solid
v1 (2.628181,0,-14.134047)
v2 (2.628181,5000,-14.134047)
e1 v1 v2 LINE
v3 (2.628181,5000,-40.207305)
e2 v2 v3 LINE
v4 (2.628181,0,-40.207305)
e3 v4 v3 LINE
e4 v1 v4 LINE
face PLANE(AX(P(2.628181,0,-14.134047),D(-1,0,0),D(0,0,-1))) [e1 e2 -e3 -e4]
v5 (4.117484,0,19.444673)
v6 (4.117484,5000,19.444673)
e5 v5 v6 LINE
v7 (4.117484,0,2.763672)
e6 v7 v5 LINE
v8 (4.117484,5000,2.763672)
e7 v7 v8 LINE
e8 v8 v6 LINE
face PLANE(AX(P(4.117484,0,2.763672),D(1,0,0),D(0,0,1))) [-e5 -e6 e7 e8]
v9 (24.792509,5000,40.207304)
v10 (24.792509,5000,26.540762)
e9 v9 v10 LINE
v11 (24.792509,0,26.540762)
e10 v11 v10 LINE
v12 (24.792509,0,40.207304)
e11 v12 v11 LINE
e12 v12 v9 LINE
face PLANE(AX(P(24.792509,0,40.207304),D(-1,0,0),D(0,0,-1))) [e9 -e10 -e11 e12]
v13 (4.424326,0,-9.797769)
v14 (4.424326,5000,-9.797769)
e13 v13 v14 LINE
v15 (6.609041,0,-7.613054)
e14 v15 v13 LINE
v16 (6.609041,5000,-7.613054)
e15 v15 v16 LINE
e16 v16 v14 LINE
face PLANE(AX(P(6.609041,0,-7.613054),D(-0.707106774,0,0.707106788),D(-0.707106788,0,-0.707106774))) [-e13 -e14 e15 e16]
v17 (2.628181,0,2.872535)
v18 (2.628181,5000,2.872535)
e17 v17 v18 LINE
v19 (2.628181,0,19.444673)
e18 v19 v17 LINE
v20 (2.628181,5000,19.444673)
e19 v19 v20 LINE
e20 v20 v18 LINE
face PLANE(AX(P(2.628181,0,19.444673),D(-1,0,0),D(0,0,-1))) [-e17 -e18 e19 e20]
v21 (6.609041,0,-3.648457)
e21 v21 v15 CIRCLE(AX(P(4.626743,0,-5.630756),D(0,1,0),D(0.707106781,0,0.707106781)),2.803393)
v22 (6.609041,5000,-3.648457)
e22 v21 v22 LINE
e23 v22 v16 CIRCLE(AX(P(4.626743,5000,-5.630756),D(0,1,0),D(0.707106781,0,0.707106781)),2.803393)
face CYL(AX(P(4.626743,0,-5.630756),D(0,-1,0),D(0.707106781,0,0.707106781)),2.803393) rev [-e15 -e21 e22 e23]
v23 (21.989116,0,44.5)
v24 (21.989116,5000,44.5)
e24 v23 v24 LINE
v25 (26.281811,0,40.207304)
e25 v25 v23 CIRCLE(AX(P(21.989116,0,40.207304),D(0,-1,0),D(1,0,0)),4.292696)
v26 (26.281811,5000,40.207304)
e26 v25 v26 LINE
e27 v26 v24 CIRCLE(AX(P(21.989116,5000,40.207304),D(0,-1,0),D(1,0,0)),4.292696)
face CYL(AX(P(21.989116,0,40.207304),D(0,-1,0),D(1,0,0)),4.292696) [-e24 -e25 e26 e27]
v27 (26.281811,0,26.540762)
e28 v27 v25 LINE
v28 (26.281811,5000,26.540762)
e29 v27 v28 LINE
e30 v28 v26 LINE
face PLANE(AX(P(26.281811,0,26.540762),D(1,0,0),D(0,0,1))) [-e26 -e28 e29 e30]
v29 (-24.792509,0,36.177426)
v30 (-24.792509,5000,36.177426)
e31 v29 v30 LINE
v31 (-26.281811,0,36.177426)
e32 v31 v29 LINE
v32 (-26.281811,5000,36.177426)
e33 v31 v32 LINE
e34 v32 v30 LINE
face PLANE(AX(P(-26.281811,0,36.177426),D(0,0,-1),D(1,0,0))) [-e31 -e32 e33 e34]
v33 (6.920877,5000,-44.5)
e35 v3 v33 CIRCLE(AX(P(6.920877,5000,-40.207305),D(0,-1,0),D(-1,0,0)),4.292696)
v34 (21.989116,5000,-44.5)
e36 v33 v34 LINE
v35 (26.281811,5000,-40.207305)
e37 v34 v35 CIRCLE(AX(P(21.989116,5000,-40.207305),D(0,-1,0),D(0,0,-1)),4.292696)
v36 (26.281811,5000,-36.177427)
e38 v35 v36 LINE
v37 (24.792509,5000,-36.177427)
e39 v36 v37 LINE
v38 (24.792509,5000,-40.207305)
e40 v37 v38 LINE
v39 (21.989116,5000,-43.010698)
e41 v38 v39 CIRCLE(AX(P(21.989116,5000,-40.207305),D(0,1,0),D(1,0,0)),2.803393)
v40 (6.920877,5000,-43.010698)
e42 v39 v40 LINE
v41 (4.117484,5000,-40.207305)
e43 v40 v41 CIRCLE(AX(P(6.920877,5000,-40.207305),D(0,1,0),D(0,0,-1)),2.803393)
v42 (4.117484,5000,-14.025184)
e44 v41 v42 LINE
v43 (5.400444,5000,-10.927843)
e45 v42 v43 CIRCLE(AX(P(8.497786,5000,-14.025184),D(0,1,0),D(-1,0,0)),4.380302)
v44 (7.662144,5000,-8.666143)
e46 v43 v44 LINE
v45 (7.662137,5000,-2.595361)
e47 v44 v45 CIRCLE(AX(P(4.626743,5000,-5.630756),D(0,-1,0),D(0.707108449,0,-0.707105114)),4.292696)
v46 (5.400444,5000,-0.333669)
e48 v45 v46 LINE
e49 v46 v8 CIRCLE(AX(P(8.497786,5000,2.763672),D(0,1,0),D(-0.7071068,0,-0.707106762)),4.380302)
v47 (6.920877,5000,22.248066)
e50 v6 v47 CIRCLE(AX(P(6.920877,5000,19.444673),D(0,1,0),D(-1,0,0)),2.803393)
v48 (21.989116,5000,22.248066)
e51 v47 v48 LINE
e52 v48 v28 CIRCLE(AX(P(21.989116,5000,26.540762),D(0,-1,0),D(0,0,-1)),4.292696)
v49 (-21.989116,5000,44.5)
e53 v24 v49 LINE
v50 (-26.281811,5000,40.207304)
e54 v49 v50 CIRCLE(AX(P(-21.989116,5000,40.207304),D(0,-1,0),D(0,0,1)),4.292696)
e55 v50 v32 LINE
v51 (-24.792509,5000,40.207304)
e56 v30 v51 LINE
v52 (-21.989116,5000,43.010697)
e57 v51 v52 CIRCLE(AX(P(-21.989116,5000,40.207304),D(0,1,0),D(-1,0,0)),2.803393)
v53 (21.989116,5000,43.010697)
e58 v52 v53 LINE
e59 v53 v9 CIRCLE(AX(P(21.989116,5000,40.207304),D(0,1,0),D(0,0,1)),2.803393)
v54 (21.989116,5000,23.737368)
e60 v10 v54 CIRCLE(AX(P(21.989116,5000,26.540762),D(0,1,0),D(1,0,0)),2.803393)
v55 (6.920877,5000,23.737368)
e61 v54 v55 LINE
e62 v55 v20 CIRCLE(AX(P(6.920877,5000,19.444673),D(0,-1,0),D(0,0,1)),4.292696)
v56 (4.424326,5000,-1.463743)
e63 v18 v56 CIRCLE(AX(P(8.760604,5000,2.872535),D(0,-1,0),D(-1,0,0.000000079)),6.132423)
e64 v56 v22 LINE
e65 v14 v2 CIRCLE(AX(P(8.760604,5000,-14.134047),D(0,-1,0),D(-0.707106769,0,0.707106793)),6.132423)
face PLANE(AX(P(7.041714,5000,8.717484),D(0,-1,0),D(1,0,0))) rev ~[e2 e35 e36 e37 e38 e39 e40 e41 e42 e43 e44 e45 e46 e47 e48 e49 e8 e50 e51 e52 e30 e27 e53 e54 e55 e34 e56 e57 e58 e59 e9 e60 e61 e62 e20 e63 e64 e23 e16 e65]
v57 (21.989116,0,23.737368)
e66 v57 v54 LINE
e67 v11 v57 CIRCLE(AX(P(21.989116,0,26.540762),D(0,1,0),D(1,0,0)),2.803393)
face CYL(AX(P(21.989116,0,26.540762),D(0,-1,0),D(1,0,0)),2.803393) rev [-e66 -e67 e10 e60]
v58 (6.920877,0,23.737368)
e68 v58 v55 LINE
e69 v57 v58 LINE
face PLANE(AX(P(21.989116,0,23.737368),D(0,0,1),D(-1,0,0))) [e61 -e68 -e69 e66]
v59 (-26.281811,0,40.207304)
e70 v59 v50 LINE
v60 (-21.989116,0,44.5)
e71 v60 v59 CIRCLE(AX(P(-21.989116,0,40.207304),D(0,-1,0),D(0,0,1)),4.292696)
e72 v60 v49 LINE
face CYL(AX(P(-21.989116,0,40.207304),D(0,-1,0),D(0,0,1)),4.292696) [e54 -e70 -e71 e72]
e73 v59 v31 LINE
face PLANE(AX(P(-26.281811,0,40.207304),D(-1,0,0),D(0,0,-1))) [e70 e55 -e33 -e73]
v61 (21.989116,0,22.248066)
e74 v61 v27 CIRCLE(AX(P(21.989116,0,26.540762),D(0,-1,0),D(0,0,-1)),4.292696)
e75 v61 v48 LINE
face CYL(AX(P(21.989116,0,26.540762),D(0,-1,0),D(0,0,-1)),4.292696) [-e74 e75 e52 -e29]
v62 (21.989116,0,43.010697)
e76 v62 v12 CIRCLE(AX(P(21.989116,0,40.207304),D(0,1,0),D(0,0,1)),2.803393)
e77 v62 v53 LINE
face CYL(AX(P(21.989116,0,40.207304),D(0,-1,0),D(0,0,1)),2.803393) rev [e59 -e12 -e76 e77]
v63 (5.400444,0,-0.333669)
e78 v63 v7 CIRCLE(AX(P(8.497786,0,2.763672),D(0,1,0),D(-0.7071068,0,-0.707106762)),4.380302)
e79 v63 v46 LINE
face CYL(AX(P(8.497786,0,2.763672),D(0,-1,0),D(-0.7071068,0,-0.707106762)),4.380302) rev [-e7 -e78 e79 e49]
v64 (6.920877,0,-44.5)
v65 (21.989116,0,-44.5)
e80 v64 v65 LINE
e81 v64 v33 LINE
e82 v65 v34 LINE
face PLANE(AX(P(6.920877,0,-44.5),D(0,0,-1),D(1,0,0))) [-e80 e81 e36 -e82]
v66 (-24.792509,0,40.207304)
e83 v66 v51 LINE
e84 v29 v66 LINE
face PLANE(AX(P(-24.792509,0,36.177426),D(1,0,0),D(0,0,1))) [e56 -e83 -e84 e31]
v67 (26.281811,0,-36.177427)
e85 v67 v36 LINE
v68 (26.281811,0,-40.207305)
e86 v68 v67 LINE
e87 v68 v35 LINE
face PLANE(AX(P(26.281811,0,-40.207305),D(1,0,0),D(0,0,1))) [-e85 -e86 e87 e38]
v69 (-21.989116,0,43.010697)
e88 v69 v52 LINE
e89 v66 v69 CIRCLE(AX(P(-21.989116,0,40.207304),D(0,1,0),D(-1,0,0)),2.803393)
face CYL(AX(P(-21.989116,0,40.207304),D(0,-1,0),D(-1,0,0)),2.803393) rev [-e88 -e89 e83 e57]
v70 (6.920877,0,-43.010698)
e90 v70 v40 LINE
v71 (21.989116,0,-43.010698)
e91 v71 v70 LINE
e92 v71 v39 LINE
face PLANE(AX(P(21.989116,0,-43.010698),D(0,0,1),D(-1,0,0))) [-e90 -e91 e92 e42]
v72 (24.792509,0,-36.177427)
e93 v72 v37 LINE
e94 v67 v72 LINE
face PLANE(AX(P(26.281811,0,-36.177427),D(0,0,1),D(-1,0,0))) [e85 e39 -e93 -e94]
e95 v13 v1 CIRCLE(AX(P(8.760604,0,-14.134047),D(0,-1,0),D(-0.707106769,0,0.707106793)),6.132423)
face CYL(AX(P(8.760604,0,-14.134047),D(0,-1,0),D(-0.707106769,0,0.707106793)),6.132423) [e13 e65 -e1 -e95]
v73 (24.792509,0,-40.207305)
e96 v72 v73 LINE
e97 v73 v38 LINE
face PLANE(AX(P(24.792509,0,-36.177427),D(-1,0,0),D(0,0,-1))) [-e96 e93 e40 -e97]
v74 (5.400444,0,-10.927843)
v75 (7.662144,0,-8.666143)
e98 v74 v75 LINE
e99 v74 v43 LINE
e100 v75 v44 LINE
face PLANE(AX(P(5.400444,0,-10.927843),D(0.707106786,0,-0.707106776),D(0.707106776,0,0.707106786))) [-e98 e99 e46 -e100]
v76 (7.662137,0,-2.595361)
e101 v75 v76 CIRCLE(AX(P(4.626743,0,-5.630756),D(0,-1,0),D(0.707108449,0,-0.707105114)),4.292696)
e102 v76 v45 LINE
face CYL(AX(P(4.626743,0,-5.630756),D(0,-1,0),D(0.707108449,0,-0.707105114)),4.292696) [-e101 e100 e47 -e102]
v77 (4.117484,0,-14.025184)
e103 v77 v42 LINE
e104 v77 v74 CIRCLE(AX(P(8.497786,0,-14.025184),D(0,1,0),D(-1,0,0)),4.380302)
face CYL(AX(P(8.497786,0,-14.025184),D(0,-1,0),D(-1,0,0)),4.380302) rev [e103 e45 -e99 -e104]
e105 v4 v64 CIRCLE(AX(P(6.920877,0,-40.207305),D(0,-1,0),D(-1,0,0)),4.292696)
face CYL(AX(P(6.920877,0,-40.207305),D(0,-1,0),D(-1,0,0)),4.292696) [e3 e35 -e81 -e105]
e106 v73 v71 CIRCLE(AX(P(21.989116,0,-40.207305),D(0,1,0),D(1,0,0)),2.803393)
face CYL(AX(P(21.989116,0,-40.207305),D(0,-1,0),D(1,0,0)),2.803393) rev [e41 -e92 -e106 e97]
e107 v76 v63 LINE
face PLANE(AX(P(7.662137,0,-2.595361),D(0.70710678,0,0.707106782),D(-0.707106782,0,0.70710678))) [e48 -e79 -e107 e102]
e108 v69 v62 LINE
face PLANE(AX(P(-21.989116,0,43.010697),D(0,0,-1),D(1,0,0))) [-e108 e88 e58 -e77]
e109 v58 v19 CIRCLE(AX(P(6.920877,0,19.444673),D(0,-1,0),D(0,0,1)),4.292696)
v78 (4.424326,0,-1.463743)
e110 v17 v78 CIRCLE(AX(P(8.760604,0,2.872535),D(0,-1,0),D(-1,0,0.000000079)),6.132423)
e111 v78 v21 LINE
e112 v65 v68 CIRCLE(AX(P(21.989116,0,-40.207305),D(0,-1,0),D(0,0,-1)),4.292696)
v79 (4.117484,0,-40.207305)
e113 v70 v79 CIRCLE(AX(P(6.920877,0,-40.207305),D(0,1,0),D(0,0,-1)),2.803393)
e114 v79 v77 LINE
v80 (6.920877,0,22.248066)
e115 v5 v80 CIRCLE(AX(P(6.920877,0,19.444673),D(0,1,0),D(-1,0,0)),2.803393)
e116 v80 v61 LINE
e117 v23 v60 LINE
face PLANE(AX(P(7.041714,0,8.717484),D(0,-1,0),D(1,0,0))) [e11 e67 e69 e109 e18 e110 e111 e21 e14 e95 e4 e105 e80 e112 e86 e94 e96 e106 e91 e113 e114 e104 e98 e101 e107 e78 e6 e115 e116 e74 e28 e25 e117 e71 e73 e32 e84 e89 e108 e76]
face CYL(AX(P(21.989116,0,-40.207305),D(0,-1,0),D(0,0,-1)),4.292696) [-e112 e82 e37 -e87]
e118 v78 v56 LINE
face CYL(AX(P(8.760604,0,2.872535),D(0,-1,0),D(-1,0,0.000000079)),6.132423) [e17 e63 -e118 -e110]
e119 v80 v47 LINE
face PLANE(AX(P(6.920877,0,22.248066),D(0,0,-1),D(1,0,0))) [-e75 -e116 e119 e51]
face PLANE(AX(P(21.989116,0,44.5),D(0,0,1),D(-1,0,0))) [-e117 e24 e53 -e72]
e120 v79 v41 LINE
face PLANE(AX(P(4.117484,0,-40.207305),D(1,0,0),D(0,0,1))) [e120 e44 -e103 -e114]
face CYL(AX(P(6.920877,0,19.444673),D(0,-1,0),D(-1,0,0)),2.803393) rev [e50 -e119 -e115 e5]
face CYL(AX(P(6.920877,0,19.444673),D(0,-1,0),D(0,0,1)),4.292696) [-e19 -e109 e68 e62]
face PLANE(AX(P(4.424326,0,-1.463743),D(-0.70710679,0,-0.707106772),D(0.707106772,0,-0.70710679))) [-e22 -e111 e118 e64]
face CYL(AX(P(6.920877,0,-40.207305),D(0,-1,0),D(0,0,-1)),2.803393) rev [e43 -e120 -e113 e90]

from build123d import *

# Parameters (mm, degrees)
F1_DEPTH = 5000


# Not quite as in the source:
# - ends of sketch curves that miss each other by under 0.0002 mm in the source are joined


with BuildPart() as f1:
    # F0 (on Front) → F1 (new body)
    with BuildSketch(Plane.XZ):
        with BuildLine():
            Line((26.2818114252, -40.2073050281), (26.2818114252, -36.177426882))
            Line((26.2818114252, -36.177426882), (24.7925087778, -36.177426882))
            Line((24.7925087778, -36.177426882), (24.7925087778, -40.2073046339))
            ThreePointArc((24.7925087778, -40.2073046339), (23.9714139143, -42.1896029892), (21.9891155591, -43.0106978526))
            Line((21.9891155591, -43.0106978526), (6.9208770086, -43.0106978526))
            ThreePointArc((6.9208770086, -43.0106978526), (4.9385786534, -42.1896029892), (4.1174837899, -40.2073046339))
            Line((4.1174837899, -40.2073046339), (4.1174837899, -30.6058300818))
            Line((4.1174837899, -30.6058300818), (4.1174837899, -14.0251837989))
            ThreePointArc((4.1174837899, -14.0251837989), (4.4509143771, -12.3489149315), (5.4004443607, -10.9278427721))
            Line((5.4004443607, -10.9278427721), (7.6621440673, -8.6661430321))
            ThreePointArc((7.6621440673, -8.6661430321), (8.9194384176, -5.6307558244), (7.662136908, -2.5953614834))
            Line((7.662136908, -2.5953614834), (5.4004444754, -0.3336690558))
            ThreePointArc((5.4004444754, -0.3336690558), (4.4509144127, 1.0874031659), (4.1174837899, 2.7636721191))
            Line((4.1174837899, 2.7636721191), (4.1174837899, 19.444672608))
            ThreePointArc((4.1174837899, 19.444672608), (4.9385786534, 21.4269709633), (6.9208770086, 22.2480658267))
            Line((6.9208770086, 22.2480658267), (21.9891155591, 22.2480658267))
            ThreePointArc((21.9891155591, 22.2480658267), (25.0245099156, 23.5053673363), (26.2818114252, 26.5407616928))
            Line((26.2818114252, 26.5407616928), (26.2818114252, 40.2073036339))
            ThreePointArc((26.2818114252, 40.2073036339), (25.0245099156, 43.2426979904), (21.9891155591, 44.4999995))
            Line((21.9891155591, 44.4999995), (-21.9891155591, 44.4999995))
            ThreePointArc((-21.9891155591, 44.4999995), (-25.0245099156, 43.2426979904), (-26.2818114252, 40.2073036339))
            Line((-26.2818114252, 40.2073036339), (-26.2818114252, 36.177425882))
            Line((-26.2818114252, 36.177425882), (-24.7925087778, 36.177425882))
            Line((-24.7925087778, 36.177425882), (-24.7925087778, 40.2073036339))
            ThreePointArc((-24.7925087778, 40.2073036339), (-23.9714139143, 42.1896019892), (-21.9891155591, 43.0106968526))
            Line((-21.9891155591, 43.0106968526), (21.9891155591, 43.0106968526))
            ThreePointArc((21.9891155591, 43.0106968526), (23.9714139143, 42.1896019892), (24.7925087778, 40.2073036339))
            Line((24.7925087778, 40.2073036339), (24.7925087778, 26.5407616928))
            ThreePointArc((24.7925087778, 26.5407616928), (23.9714139143, 24.5584633375), (21.9891155591, 23.7373684741))
            Line((21.9891155591, 23.7373684741), (6.9208770086, 23.7373684741))
            ThreePointArc((6.9208770086, 23.7373684741), (3.8854826521, 22.4800669645), (2.6281811425, 19.444672608))
            Line((2.6281811425, 19.444672608), (2.6281811425, 2.8725354557))
            ThreePointArc((2.6281811425, 2.8725354557), (3.0949839305, 0.525758642), (4.4243261563, -1.4637426783))
            Line((4.4243261563, -1.4637426783), (6.6090409069, -3.6484574844))
            ThreePointArc((6.6090409069, -3.6484574844), (7.4301357701, -5.6307558399), (6.6090409067, -7.6130541952))
            Line((6.6090409067, -7.6130541952), (4.4243263037, -9.7977687547))
            ThreePointArc((4.4243263037, -9.7977687547), (3.0949840701, -11.7872699409), (2.6281811425, -14.1340466099))
            Line((2.6281811425, -14.1340466099), (2.6281811425, -30.4969672709))
            Line((2.6281811425, -30.4969672709), (2.6281811425, -40.2073046339))
            ThreePointArc((2.6281811425, -40.2073046339), (3.8854826521, -43.2426989904), (6.9208770086, -44.5000005))
            Line((6.9208770086, -44.5000005), (21.9891155591, -44.5000005))
            ThreePointArc((21.9891155591, -44.5000005), (25.0245099156, -43.2426989904), (26.2818114252, -40.2073050281))
        make_face()
    extrude(amount=-F1_DEPTH)


solid = f1.part
